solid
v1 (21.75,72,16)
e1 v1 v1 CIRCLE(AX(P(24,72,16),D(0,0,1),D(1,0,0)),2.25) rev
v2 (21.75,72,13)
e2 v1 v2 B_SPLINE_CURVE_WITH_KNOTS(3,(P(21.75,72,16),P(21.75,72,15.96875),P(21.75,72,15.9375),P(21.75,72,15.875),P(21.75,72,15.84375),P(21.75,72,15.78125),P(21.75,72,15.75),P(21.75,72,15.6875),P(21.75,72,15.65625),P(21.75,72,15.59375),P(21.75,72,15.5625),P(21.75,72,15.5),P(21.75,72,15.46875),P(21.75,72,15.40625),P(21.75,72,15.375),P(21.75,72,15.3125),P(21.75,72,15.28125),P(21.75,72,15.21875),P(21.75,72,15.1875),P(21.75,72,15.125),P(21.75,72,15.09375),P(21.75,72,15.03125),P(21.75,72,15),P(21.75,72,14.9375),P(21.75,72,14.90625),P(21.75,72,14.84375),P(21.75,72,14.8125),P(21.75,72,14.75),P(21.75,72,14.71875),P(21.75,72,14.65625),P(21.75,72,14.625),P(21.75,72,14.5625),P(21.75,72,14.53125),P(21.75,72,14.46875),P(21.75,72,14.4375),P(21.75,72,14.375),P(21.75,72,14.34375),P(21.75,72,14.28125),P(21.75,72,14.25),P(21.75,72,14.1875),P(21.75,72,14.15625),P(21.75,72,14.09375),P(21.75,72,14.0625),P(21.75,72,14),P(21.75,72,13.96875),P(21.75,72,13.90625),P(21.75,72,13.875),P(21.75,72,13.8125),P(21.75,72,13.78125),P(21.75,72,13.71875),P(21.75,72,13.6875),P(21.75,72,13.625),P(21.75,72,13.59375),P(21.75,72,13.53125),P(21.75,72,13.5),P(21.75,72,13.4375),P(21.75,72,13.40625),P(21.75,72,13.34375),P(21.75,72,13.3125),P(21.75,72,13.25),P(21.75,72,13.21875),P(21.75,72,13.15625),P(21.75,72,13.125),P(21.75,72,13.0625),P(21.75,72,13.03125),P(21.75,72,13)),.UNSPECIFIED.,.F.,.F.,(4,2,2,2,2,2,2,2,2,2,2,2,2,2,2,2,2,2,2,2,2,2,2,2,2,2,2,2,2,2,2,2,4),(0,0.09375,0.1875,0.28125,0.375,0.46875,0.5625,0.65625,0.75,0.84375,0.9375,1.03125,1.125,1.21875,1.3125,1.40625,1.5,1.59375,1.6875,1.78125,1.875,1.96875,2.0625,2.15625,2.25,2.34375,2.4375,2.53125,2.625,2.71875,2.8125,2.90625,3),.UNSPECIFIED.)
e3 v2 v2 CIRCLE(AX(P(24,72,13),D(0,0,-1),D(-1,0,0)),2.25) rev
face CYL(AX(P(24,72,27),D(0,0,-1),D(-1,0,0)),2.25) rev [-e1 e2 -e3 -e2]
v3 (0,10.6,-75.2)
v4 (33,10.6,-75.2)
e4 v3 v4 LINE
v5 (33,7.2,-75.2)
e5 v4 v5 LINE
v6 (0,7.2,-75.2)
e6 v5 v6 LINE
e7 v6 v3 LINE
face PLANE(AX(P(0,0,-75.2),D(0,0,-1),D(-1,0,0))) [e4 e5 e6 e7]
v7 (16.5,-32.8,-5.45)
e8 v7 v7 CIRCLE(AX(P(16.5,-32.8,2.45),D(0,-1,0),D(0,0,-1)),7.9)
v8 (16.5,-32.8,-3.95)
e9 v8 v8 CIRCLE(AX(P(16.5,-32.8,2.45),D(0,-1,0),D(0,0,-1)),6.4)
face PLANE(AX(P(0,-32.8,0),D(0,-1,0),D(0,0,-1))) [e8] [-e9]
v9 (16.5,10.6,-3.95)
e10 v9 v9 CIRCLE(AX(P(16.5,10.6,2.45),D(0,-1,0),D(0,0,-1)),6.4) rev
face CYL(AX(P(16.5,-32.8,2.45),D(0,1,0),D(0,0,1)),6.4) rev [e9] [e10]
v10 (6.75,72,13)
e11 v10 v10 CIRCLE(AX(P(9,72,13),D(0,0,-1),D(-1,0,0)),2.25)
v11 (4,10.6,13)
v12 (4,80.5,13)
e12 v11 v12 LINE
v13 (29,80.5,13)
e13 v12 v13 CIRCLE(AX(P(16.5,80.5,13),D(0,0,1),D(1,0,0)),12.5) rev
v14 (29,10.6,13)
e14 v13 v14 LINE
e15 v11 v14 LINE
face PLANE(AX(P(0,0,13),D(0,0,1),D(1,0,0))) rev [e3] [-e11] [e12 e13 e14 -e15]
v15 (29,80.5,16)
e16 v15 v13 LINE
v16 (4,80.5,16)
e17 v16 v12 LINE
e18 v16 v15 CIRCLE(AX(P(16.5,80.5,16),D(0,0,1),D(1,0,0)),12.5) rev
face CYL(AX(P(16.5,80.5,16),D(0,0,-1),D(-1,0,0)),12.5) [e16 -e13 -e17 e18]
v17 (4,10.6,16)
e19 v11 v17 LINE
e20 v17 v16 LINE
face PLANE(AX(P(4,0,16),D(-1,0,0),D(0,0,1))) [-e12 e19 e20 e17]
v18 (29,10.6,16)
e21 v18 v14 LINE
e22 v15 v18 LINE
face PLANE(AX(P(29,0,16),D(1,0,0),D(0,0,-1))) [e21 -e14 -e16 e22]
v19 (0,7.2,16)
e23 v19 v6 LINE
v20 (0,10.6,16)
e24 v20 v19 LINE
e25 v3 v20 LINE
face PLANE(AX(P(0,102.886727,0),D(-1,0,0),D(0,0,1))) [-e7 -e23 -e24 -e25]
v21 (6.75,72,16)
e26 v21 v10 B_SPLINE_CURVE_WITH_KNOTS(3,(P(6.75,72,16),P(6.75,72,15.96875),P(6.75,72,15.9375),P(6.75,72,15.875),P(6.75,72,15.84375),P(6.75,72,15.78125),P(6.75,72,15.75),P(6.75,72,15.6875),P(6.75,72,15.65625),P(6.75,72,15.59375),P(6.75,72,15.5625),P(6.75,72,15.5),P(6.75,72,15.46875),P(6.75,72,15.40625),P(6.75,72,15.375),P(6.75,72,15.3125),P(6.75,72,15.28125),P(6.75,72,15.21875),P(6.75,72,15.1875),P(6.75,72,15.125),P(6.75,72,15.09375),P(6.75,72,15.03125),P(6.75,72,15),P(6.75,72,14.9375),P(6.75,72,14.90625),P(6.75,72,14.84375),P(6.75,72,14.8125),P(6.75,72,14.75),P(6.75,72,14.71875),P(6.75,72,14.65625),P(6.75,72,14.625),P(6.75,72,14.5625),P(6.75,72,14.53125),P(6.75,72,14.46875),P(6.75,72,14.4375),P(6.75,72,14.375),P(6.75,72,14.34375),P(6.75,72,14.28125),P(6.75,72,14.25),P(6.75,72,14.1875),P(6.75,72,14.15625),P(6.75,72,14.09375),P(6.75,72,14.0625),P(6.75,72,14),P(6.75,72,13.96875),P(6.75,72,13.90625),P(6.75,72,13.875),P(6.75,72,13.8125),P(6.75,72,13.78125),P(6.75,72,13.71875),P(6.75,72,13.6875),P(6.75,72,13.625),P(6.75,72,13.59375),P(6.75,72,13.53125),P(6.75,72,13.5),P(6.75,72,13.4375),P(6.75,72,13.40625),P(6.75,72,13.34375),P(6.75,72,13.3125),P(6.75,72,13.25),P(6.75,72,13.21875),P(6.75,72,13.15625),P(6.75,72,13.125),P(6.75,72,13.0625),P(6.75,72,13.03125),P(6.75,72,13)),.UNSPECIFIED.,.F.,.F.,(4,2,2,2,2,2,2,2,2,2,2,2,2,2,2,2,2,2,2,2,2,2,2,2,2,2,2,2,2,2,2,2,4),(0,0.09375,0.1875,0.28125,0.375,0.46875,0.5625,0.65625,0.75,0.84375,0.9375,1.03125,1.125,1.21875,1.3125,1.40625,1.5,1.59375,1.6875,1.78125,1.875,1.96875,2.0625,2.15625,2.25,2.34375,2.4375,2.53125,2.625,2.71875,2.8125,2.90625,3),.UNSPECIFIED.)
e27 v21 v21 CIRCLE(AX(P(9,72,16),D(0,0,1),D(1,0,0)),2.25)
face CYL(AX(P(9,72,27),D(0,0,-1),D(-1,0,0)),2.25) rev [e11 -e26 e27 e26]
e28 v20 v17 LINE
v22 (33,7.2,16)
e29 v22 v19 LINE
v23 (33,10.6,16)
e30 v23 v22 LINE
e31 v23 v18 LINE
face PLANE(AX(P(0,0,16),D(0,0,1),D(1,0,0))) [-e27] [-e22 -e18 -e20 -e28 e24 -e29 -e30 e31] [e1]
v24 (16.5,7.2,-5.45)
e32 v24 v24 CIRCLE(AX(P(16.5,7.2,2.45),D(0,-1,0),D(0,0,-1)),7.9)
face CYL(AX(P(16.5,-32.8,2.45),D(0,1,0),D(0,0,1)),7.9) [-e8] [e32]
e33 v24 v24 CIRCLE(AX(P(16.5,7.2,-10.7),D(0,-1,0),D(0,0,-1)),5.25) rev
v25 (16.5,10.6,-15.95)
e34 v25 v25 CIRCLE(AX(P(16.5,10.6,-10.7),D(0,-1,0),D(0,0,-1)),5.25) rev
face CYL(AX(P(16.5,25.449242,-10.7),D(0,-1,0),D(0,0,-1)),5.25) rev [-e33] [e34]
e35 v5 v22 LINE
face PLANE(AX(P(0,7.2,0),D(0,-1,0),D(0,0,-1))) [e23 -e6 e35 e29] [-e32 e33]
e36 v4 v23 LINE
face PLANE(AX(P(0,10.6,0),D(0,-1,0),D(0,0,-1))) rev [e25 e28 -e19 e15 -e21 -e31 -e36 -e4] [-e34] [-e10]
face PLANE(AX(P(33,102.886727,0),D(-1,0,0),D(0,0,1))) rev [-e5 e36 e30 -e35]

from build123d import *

# Parameters (mm, degrees)
SKETCH1_W            = 4
SKETCH1_H            = 80.5
BOSS_EXTRUDE1_DEPTH  = 71
BOSS_EXTRUDE2_START  = -4
BOSS_EXTRUDE2_DEPTH  = 4
BOSS_EXTRUDE3_DEPTH  = 34.2
CUT_EXTRUDE1_DEPTH   = 13
CUT_EXTRUDE2_DEPTH   = 13
SKETCH6_R            = 1.7
CUT_EXTRUDE3_DEPTH   = 13
SKETCH7_R            = 3.25
CUT_EXTRUDE4_DEPTH   = 2.5
BOSS_EXTRUDE4_DEPTH  = 44.5
SKETCH10_W           = 46.002383675
SKETCH10_H           = 61.711229379
CUT_EXTRUDE5_DEPTH   = 42
FILLET1_R            = 18
BOSS_EXTRUDE5_DEPTH  = 4
FILLET3_R            = 16.2
FILLET4_R            = 14
CUT_EXTRUDE6_DEPTH   = 10.6
BOSS_EXTRUDE6_START  = 4
BOSS_EXTRUDE6_DEPTH  = 4
CUT_EXTRUDE7_DEPTH   = 148
BOSS_EXTRUDE7_DEPTH  = 3
CUT_EXTRUDE8_DEPTH   = 14
SKETCH17_R           = 2.25
CUT_EXTRUDE9_DEPTH   = 14
SKETCH18_W           = 25
SKETCH18_H           = 92.2
BOSS_EXTRUDE8_DEPTH  = 4
SKETCH19_W           = 4
SKETCH19_H           = 92.2
BOSS_EXTRUDE9_DEPTH  = 4
SKETCH20_R           = 5.25
CUT_EXTRUDE10_DEPTH  = 4
SKETCH21_W           = 33
SKETCH21_H           = 92.2
CUT_EXTRUDE11_DEPTH  = 0.6
SKETCH22_R           = 5.25
CUT_EXTRUDE12_DEPTH  = 3.4
BOSS_EXTRUDE10_DEPTH = 40
SKETCH24_R           = 6.4
CUT_EXTRUDE13_DEPTH  = 3.4
BOSS_EXTRUDE11_DEPTH = 15
SKETCH26_W           = 10
SKETCH26_H           = 1.5
BOSS_EXTRUDE12_DEPTH = 15
CUT_EXTRUDE14_DEPTH  = 15
SKETCH28_W           = 33
SKETCH28_H           = 3.4
CUT_EXTRUDE15_DEPTH  = 1


with BuildPart() as part:
    # Sketch1 → Boss-Extrude1 (new body)
    with BuildSketch(Plane.XY):
        with Locations((2, 40.25)):
            Rectangle(SKETCH1_W, SKETCH1_H)
        with BuildLine():
            Line((0, 80.5), (4, 80.5))
            ThreePointArc((4, 80.5), (16.5, 93), (29, 80.5))
            Line((29, 80.5), (33, 80.5))
            ThreePointArc((33, 80.5), (16.5, 97), (0, 80.5))
        make_face()
        with Locations((31, 40.25)):
            Rectangle(SKETCH1_W, SKETCH1_H)
    extrude(amount=BOSS_EXTRUDE1_DEPTH)

    # Sketch2 → Boss-Extrude2 (add)
    with BuildSketch(Plane.XY.offset(71).offset(BOSS_EXTRUDE2_START)):
        with BuildLine():
            Line((33, 48.5), (0, 48.5))
            Line((0, 48.5), (0, 80.5))
            ThreePointArc((0, 80.5), (16.5, 97), (33, 80.5))
            Line((33, 80.5), (33, 48.5))
        make_face()
    extrude(amount=BOSS_EXTRUDE2_DEPTH)

    # Sketch3 → Boss-Extrude3 (add)
    with BuildSketch(Plane(origin=(0, 0, 67), x_dir=(-1, 0, 0), z_dir=(0, 0, -1))):
        Polygon((-33, 0), (-33, 48.5), (-29, 48.5), (-4, 48.5), (0, 48.5), (0, 0), (-3.837905566, 0), (-4, 44.5), (-29, 44.5), (-29.162094434, 0), align=None)
    extrude(amount=-BOSS_EXTRUDE3_DEPTH)

    # Sketch4 → Cut-Extrude1 (cut)
    with BuildSketch(Plane(origin=(0, 0, 0), x_dir=(-1, 0, 0), z_dir=(0, 0, -1))):
        with BuildLine():
            Line((-4, 80.5), (-4, 0))
            Line((-4, 0), (0, 0))
            Line((0, 0), (0, 80.5))
            ThreePointArc((0, 80.5), (-16.5, 97), (-33, 80.5))
            Line((-33, 80.5), (-33, 0))
            Line((-33, 0), (-29, 0))
            Line((-29, 0), (-29, 80.5))
            ThreePointArc((-29, 80.5), (-16.5, 93), (-4, 80.5))
        make_face()
    extrude(amount=-CUT_EXTRUDE1_DEPTH, mode=Mode.SUBTRACT)

    # Sketch5 → Cut-Extrude2 (cut)
    with BuildSketch(Plane.XY.offset(71)):
        with BuildLine():
            ThreePointArc((26.5, 80.5), (16.5, 90.5), (6.5, 80.5))
            Line((6.5, 80.5), (26.5, 80.5))
        make_face()
        with BuildLine():
            Line((26.5, 80.5), (6.5, 80.5))
            ThreePointArc((6.5, 80.5), (16.5, 70.5), (26.5, 80.5))
        make_face()
    extrude(amount=-CUT_EXTRUDE2_DEPTH, mode=Mode.SUBTRACT)

    # Sketch6 → Cut-Extrude3 (cut)
    with BuildSketch(Plane.XY.offset(71)):
        with Locations((6.5, 70.5)):
            Circle(SKETCH6_R)
        with BuildLine():
            ThreePointArc((28.2, 70.5), (26.5, 72.2), (24.8, 70.5))
            Line((24.8, 70.5), (28.2, 70.5))
        make_face()
        with BuildLine():
            Line((28.2, 70.5), (24.8, 70.5))
            ThreePointArc((24.8, 70.5), (26.5, 68.8), (28.2, 70.5))
        make_face()
    extrude(amount=-CUT_EXTRUDE3_DEPTH, mode=Mode.SUBTRACT)

    # Sketch7 → Cut-Extrude4 (cut)
    with BuildSketch(Plane.XY.offset(71)):
        with Locations((6.5, 70.5)):
            Circle(SKETCH7_R)
        with Locations((26.5, 70.5)):
            Circle(SKETCH7_R)
    extrude(amount=-CUT_EXTRUDE4_DEPTH, mode=Mode.SUBTRACT)

    # Sketch9 → Boss-Extrude4 (add)
    with BuildSketch(Plane.XZ):
        Polygon((29.162094434, 101.2), (29.162094434, 71), (29, 71), (29, 120), align=None)
        Polygon((4, 120), (3.837905566, 101.2), (3.837905566, 71), (4, 71), align=None)
    extrude(amount=-BOSS_EXTRUDE4_DEPTH)

    # Sketch10 → Cut-Extrude5 (cut)
    with BuildSketch(Plane.XY.offset(101.2)):
        with Locations((17.24268837, 24.291112106)):
            Rectangle(SKETCH10_W, SKETCH10_H)
    extrude(amount=CUT_EXTRUDE5_DEPTH, mode=Mode.SUBTRACT)

    # Fillet1
    fillet1_edges = [part.edges().sort_by_distance(p)[0] for p in [
        (16.5, 48.5, 71),
        (16.5, 44.5, 67),
    ]]
    fillet(fillet1_edges, radius=FILLET1_R)

    # Sketch11 → Boss-Extrude5 (add)
    with BuildSketch(Plane.XY.offset(101.2)):
        Polygon((29, 0), (4, 0), (0, 0), (0, 48.5), (33, 48.5), (33, 0), align=None)
    extrude(amount=BOSS_EXTRUDE5_DEPTH)

    # Fillet3
    fillet3_edges = [part.edges().sort_by_distance(p)[0] for p in [
        (16.5, 48.5, 105.2),
    ]]
    fillet(fillet3_edges, radius=FILLET3_R - 0.0001)  # a hair under: the kernel refuses the full size

    # Fillet4
    fillet4_edges = [part.edges().sort_by_distance(p)[0] for p in [
        (16.5, 44.5, 101.2),
    ]]
    fillet(fillet4_edges, radius=FILLET4_R)

    # Sketch12 → Cut-Extrude6 (cut)
    with BuildSketch(Plane.XZ):
        Polygon((4, 13), (4, 101.2), (29, 101.2), (29, 13), (33, 13), (33, 105.2), (0, 105.2), (0, 13), align=None)
    extrude(amount=-CUT_EXTRUDE6_DEPTH, mode=Mode.SUBTRACT)

    # Sketch13 → Boss-Extrude6 (add)
    with BuildSketch(Plane(origin=(0, 0, 13), x_dir=(-1, 0, 0), z_dir=(0, 0, -1)).offset(BOSS_EXTRUDE6_START)):
        with BuildLine():
            Line((-33, 80.5), (-33, 10.6))
            Line((-33, 10.6), (-29, 10.6))
            Line((-29, 10.6), (-29, 80.5))
            ThreePointArc((-29, 80.5), (-16.5, 93), (-4, 80.5))
            Line((-4, 80.5), (-4, 10.6))
            Line((-4, 10.6), (0, 10.6))
            Line((0, 10.6), (0, 80.5))
            ThreePointArc((0, 80.5), (-16.5, 97), (-33, 80.5))
        make_face()
    extrude(amount=-BOSS_EXTRUDE6_DEPTH)

    # Sketch14 → Cut-Extrude7 (cut)
    with BuildSketch(Plane(origin=(0, 0, 13), x_dir=(-1, 0, 0), z_dir=(0, 0, -1))):
        with BuildLine():
            Line((-29, 10.6), (-4, 10.6))
            Line((-4, 10.6), (0, 10.6))
            Line((0, 10.6), (0, 80.5))
            ThreePointArc((0, 80.5), (-16.5, 97), (-33, 80.5))
            Line((-33, 80.5), (-33, 10.6))
            Line((-33, 10.6), (-29, 10.6))
        make_face()
    extrude(amount=-CUT_EXTRUDE7_DEPTH, mode=Mode.SUBTRACT)

    # Sketch16 → Cut-Extrude8 (cut)
    with BuildSketch(Plane(origin=(0, 0, 9), x_dir=(-1, 0, 0), z_dir=(0, 0, -1))):
        with BuildLine():
            Line((-33, 80.5), (-33, 10.6))
            Line((-33, 10.6), (-29, 10.6))
            Line((-29, 10.6), (-29, 80.5))
            ThreePointArc((-29, 80.5), (-16.5, 93), (-4, 80.5))
            Line((-4, 80.5), (-4, 10.6))
            Line((-4, 10.6), (0, 10.6))
            Line((0, 10.6), (0, 80.5))
            ThreePointArc((0, 80.5), (-16.5, 97), (-33, 80.5))
        make_face()
    extrude(amount=-CUT_EXTRUDE8_DEPTH, mode=Mode.SUBTRACT)


with BuildPart() as body_2:
    # Sketch15 → Boss-Extrude7 (new body)
    with BuildSketch(Plane.XY.offset(13)):
        with BuildLine():
            Line((4, 10.6), (29, 10.6))
            Line((29, 10.6), (29, 80.5))
            ThreePointArc((29, 80.5), (16.5, 93), (4, 80.5))
            Line((4, 80.5), (4, 10.6))
        make_face()
    extrude(amount=BOSS_EXTRUDE7_DEPTH)

    # Sketch17 → Cut-Extrude9 (cut)
    with BuildSketch(Plane(origin=(0, 0, 13), x_dir=(-1, 0, 0), z_dir=(0, 0, -1))):
        with Locations((-24, 72)):
            Circle(SKETCH17_R)
        with Locations((-9, 72)):
            Circle(SKETCH17_R)
    extrude(amount=-CUT_EXTRUDE9_DEPTH, mode=Mode.SUBTRACT)

    # Sketch18 → Boss-Extrude8 (add)
    with BuildSketch(Plane.XZ.offset(-10.6)):
        with Locations((16.5, -30.1)):
            Rectangle(SKETCH18_W, SKETCH18_H)
    extrude(amount=BOSS_EXTRUDE8_DEPTH)

    # Sketch19 → Boss-Extrude9 (add)
    with BuildSketch(Plane.XZ.offset(-6.6)):
        with Locations((2, -30.1)):
            Rectangle(SKETCH19_W, SKETCH19_H)
        with Locations((31, -30.1)):
            Rectangle(SKETCH19_W, SKETCH19_H)
    extrude(amount=-BOSS_EXTRUDE9_DEPTH)

    # Sketch20 → Cut-Extrude10 (cut)
    with BuildSketch(Plane.XZ.offset(-6.6)):
        with Locations(Location((16.5, -10.7, 0), (0, 0, 270))):
            Circle(SKETCH20_R)
    extrude(amount=-CUT_EXTRUDE10_DEPTH, mode=Mode.SUBTRACT)

    # Sketch21 → Cut-Extrude11 (cut)
    with BuildSketch(Plane.XZ.offset(-6.6)):
        with Locations((16.5, -30.1)):
            Rectangle(SKETCH21_W, SKETCH21_H)
    extrude(amount=-CUT_EXTRUDE11_DEPTH, mode=Mode.SUBTRACT)

    # Sketch22 → Cut-Extrude12 (cut)
    with BuildSketch(Plane.XZ.offset(-7.2)):
        with Locations(Location((16.5, 1.3, 0), (0, 0, 270))):
            Circle(SKETCH22_R)
    extrude(amount=-CUT_EXTRUDE12_DEPTH, mode=Mode.SUBTRACT)

    # Sketch23 → Boss-Extrude10 (add)
    with BuildSketch(Plane.XZ.offset(-7.2)):
        with BuildLine():
            ThreePointArc((16.5, 10.35), (8.6, 2.45), (16.5, -5.45))
            Line((16.5, -5.45), (16.5, -3.95))
            ThreePointArc((16.5, -3.95), (10.1, 2.45), (16.5, 8.85))
            Line((16.5, 8.85), (16.5, 10.35))
        make_face()
        with BuildLine():
            Line((16.5, -3.95), (16.5, -5.45))
            ThreePointArc((16.5, -5.45), (22.086143571, -3.136143571), (24.4, 2.45))
            ThreePointArc((24.4, 2.45), (22.086143571, 8.036143571), (16.5, 10.35))
            Line((16.5, 10.35), (16.5, 8.85))
            ThreePointArc((16.5, 8.85), (21.0254834, 6.9754834), (22.9, 2.45))
            ThreePointArc((22.9, 2.45), (21.0254834, -2.0754834), (16.5, -3.95))
        make_face()
    extrude(amount=BOSS_EXTRUDE10_DEPTH)

    # Sketch24 → Cut-Extrude13 (cut)
    with BuildSketch(Plane.XZ.offset(-7.2)):
        with Locations(Location((16.5, 2.45, 0), (0, 0, 270))):
            Circle(SKETCH24_R)
    extrude(amount=-CUT_EXTRUDE13_DEPTH, mode=Mode.SUBTRACT)

    # Sketch25 → Boss-Extrude11 (add)
    with BuildSketch(Plane(origin=(0, 10.6, 0), x_dir=(1, 0, 0), z_dir=(0, 1, 0))):
        Polygon((26.5, 72.7), (6.5, 72.7), (6.5, 74.7), (16.5, 74.7), (26.5, 74.7), align=None)
    extrude(amount=BOSS_EXTRUDE11_DEPTH)

    # Sketch26 → Boss-Extrude12 (add)
    with BuildSketch(Plane(origin=(0, 10.6, 0), x_dir=(1, 0, 0), z_dir=(0, 1, 0))):
        with Locations((16.5, 75.45)):
            Rectangle(SKETCH26_W, SKETCH26_H)
    extrude(amount=BOSS_EXTRUDE12_DEPTH)

    # Sketch27 → Cut-Extrude14 (cut)
    with BuildSketch(Plane(origin=(0, 10.6, 0), x_dir=(1, 0, 0), z_dir=(0, 1, 0))):
        Polygon((6.5, 72.7), (26.5, 72.7), (26.5, 74.7), (21.5, 74.7), (21.5, 76.2), (11.5, 76.2), (11.5, 74.7), (6.5, 74.7), align=None)
    extrude(amount=CUT_EXTRUDE14_DEPTH, mode=Mode.SUBTRACT)

    # Sketch28 → Cut-Extrude15 (cut)
    with BuildSketch(Plane(origin=(0, 0, -76.2), x_dir=(-1, 0, 0), z_dir=(0, 0, -1))):
        with Locations((-16.5, 8.9)):
            Rectangle(SKETCH28_W, SKETCH28_H)
    extrude(amount=-CUT_EXTRUDE15_DEPTH, mode=Mode.SUBTRACT)


solid = body_2.part
